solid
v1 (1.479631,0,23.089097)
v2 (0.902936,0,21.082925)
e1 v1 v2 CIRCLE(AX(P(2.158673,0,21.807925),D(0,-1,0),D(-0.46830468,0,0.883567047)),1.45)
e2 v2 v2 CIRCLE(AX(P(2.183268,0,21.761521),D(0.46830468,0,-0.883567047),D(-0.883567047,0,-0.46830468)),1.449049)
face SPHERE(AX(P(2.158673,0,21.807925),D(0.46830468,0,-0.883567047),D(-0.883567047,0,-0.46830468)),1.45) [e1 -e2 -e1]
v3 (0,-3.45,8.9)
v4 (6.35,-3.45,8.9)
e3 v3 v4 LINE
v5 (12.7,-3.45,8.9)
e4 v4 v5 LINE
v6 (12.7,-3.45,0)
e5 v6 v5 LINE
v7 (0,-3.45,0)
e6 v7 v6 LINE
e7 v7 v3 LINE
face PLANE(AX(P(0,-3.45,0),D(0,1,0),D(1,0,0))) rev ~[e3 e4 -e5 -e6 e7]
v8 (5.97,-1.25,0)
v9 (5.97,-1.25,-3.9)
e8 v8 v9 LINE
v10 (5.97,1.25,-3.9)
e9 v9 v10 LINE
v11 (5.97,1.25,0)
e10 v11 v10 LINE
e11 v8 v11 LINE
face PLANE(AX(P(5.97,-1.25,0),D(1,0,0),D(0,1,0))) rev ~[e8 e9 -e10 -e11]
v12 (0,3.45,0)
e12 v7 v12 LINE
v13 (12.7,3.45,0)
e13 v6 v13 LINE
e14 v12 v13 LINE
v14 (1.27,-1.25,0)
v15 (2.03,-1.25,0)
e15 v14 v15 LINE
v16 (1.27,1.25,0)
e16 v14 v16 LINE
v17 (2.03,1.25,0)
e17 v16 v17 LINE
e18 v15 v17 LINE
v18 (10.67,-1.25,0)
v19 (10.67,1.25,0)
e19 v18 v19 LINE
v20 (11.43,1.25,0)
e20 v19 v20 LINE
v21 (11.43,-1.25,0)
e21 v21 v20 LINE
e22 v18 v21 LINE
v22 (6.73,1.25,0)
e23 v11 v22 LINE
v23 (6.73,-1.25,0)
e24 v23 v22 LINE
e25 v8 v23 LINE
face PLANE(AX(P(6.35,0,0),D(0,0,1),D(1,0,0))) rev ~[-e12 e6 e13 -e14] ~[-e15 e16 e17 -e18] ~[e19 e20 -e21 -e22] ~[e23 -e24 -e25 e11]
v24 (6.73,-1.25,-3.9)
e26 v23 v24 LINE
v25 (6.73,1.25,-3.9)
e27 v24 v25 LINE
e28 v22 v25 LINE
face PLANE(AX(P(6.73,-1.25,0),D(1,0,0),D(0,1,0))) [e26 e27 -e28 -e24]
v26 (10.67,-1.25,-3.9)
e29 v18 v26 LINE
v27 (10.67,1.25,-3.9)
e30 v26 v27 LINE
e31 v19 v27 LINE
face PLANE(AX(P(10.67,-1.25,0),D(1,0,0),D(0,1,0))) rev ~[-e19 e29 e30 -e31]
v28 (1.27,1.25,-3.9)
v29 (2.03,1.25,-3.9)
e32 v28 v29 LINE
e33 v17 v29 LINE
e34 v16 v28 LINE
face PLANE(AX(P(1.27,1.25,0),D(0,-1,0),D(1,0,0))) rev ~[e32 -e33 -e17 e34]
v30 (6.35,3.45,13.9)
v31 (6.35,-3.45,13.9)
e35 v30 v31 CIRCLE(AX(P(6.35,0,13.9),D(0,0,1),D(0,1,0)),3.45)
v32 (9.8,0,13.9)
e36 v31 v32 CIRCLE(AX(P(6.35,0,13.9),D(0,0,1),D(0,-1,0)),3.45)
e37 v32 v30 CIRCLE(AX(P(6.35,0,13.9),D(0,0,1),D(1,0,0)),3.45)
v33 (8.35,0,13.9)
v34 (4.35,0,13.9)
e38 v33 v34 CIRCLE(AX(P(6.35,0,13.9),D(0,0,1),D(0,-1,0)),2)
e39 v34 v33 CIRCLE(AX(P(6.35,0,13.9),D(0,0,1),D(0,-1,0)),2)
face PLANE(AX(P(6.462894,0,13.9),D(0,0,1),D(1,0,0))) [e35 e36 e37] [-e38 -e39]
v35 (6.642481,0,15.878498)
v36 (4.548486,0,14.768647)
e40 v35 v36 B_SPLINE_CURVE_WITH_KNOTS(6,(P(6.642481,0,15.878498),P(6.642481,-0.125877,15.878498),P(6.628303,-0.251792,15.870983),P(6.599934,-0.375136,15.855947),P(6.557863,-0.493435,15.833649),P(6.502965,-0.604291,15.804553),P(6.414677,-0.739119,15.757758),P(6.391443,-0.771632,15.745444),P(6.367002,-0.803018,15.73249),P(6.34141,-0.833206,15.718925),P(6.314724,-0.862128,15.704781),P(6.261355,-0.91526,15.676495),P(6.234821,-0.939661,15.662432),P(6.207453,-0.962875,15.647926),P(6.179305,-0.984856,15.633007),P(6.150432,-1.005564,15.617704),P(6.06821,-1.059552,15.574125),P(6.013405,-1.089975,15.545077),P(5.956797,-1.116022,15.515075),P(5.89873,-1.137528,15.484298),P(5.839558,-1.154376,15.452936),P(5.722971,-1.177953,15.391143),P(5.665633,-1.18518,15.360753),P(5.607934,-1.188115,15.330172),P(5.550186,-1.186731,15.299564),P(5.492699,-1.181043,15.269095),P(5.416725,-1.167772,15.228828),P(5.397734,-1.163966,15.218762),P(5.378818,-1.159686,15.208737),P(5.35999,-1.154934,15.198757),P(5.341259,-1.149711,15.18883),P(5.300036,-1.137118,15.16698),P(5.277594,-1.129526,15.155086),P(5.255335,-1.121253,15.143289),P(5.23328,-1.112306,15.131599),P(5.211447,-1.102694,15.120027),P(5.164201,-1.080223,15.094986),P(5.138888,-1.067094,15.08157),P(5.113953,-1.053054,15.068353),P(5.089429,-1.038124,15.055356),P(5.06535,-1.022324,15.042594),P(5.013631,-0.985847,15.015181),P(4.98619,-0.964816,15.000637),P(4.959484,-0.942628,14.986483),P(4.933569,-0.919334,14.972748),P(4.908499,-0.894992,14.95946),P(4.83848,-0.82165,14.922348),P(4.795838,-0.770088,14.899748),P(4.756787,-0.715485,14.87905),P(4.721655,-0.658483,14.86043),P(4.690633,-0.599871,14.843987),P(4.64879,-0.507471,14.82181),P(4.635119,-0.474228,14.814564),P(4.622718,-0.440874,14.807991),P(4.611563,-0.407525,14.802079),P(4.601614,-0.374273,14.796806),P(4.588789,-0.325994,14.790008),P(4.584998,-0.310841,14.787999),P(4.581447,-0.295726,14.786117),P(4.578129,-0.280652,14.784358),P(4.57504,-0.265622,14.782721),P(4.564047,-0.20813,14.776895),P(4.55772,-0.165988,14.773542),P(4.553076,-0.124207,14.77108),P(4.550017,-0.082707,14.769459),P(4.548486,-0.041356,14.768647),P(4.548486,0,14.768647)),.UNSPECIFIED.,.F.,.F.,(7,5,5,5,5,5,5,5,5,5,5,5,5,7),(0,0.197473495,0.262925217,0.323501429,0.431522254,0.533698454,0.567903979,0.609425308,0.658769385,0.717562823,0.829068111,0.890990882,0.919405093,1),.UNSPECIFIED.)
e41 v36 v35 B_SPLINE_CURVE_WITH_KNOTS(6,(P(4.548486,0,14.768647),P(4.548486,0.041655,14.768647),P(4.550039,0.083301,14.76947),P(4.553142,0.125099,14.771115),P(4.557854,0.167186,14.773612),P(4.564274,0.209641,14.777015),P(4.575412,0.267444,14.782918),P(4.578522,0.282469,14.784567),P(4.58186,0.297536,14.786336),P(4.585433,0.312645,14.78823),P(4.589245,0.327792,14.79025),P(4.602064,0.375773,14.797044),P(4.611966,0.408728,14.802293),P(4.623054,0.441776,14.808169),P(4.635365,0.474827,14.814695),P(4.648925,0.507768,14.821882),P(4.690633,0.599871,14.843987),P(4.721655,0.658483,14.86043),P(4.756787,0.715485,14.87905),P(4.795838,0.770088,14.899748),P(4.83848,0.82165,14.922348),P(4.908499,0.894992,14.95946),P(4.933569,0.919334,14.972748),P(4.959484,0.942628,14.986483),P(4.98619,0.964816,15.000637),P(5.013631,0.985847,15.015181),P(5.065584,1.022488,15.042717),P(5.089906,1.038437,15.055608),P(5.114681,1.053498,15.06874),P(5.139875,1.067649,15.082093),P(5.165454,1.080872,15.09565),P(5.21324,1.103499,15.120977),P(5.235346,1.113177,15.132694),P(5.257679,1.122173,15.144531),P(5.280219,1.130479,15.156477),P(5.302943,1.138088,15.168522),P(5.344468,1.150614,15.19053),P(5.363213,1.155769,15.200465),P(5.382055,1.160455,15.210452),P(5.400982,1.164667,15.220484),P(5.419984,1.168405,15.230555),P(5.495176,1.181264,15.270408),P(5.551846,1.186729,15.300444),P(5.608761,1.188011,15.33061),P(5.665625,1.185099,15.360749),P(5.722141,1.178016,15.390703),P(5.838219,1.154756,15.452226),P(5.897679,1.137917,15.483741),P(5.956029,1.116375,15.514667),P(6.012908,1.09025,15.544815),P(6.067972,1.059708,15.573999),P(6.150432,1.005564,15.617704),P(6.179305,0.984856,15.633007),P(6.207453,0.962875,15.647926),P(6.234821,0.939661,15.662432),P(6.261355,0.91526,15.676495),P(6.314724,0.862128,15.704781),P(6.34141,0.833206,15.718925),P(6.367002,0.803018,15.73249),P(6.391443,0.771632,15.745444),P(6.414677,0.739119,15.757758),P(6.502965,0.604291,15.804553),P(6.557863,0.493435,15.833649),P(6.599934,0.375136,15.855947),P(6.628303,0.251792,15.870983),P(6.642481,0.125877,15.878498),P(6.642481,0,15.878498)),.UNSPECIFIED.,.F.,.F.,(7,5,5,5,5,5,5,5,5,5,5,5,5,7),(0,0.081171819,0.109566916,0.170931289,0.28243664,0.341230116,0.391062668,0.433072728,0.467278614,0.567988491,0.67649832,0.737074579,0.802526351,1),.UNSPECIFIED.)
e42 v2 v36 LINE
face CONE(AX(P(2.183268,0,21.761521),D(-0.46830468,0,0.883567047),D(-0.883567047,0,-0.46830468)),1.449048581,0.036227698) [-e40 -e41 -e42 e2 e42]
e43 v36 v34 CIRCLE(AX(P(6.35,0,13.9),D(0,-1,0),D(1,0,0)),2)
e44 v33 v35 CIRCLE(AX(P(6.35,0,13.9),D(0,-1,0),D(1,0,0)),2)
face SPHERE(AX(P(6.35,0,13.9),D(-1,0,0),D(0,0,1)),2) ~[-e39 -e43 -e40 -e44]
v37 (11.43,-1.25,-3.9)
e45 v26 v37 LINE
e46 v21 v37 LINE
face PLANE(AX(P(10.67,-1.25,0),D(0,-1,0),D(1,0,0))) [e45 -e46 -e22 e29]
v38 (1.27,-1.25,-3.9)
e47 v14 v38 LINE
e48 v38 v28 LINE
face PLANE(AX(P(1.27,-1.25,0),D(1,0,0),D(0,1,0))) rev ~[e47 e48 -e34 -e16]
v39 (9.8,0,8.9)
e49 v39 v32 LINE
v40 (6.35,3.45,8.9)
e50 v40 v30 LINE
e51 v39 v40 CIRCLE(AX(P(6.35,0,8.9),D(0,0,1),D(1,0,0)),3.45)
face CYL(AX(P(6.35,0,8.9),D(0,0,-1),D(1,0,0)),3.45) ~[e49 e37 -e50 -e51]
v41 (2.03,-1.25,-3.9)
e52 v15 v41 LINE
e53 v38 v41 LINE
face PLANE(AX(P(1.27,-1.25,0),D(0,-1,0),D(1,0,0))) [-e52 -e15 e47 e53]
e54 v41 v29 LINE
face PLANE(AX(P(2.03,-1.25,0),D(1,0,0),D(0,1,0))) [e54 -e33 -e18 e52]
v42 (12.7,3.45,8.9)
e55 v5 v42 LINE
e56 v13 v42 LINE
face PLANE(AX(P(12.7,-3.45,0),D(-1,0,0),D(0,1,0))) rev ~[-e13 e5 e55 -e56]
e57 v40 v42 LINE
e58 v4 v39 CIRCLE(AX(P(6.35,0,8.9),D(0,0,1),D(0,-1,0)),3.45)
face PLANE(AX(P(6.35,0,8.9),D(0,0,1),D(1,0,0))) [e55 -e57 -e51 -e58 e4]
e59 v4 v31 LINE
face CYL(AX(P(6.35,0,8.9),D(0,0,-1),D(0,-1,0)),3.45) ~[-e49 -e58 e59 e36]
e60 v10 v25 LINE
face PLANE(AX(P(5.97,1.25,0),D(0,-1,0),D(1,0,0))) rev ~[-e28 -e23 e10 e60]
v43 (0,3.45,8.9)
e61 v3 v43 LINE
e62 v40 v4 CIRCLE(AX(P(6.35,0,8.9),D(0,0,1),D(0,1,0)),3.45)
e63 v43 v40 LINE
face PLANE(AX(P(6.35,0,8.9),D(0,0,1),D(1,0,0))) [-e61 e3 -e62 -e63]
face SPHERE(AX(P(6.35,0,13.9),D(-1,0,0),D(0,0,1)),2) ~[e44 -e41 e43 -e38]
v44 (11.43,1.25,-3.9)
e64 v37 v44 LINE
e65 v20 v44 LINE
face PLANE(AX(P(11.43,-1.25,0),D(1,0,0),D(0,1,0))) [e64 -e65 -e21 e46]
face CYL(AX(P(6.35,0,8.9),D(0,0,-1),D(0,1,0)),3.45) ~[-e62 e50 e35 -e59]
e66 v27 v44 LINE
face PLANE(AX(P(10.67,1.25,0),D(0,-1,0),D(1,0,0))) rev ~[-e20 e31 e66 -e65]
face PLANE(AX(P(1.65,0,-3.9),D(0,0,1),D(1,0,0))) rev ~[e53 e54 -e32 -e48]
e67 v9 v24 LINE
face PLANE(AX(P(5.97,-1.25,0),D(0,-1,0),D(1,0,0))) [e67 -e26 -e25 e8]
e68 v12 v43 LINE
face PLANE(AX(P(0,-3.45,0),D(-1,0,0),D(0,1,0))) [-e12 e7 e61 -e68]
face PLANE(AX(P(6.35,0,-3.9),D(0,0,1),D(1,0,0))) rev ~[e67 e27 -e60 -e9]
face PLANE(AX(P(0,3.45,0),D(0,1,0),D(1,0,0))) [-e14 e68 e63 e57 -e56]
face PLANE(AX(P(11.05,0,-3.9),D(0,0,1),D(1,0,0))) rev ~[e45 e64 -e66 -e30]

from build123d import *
from build123d import SkipClean  # not in build123d's __all__

# Parameters (mm, degrees)
F0_W     = 12.7
F0_H     = 6.9
F1_DEPTH = 8.9
F3_DEPTH = 5
F8_W     = 0.76
F8_H     = 2.5
F9_DEPTH = 3.9


with BuildPart() as f1:
    # F0 (on Top) → F1 (new body)
    with BuildSketch(Plane.XY):
        with Locations((6.35, 0)):
            Rectangle(F0_W, F0_H)
    extrude(amount=F1_DEPTH)

    # F2 (on face) → F3 (join)
    with BuildSketch(Plane.XY.offset(8.9)):
        with BuildLine():
            ThreePointArc((6.35, -3.45), (8.7895183951, -2.4395183951), (9.8, 0))
            ThreePointArc((9.8, 0), (8.7895183951, 2.4395183951), (6.35, 3.45))
            ThreePointArc((6.35, 3.45), (2.9, 0), (6.35, -3.45))
        make_face()
    extrude(amount=F3_DEPTH)

    # F4 (on Front) → F5 (revolve)
    with BuildSketch(Plane.XZ):
        with BuildLine():
            Line((0.9029362769, 21.0829250706), (5.05, 13.9))
            Line((5.05, 13.9), (6.35, 13.9))
            Line((6.35, 13.9), (1.4796313262, 23.0890972887))
            ThreePointArc((1.4796313262, 23.0890972887), (0.7651079647, 22.2085198521), (0.9029362769, 21.0829250706))
        make_face()
    revolve(axis=Axis((3.9148156631, 0, 18.4945486443), (0.4683046802, 0, -0.883567047)))

    # F6 (on Front) → F7 (revolve)
    with BuildSketch(Plane.XZ):
        with BuildLine():
            ThreePointArc((8.35, 13.9), (6.35, 15.9), (4.35, 13.9))
            Line((4.35, 13.9), (8.35, 13.9))
        make_face()
    with SkipClean():  # cleaning this boolean's faces spoils the solid; the shape is the same uncleaned
        revolve(axis=Axis((6.35, 0, 13.9), (1, 0, 0)))

    # F8 (on Top) → F9 (join)
    with BuildSketch(Plane.XY):
        with Locations((1.65, 0)):
            Rectangle(F8_W, F8_H)
        with Locations((6.35, 0)):
            Rectangle(F8_W, F8_H)
        with Locations((11.05, 0)):
            Rectangle(F8_W, F8_H)
    with SkipClean():  # cleaning this boolean's faces spoils the solid; the shape is the same uncleaned
        extrude(amount=-F9_DEPTH)


solid = f1.part
